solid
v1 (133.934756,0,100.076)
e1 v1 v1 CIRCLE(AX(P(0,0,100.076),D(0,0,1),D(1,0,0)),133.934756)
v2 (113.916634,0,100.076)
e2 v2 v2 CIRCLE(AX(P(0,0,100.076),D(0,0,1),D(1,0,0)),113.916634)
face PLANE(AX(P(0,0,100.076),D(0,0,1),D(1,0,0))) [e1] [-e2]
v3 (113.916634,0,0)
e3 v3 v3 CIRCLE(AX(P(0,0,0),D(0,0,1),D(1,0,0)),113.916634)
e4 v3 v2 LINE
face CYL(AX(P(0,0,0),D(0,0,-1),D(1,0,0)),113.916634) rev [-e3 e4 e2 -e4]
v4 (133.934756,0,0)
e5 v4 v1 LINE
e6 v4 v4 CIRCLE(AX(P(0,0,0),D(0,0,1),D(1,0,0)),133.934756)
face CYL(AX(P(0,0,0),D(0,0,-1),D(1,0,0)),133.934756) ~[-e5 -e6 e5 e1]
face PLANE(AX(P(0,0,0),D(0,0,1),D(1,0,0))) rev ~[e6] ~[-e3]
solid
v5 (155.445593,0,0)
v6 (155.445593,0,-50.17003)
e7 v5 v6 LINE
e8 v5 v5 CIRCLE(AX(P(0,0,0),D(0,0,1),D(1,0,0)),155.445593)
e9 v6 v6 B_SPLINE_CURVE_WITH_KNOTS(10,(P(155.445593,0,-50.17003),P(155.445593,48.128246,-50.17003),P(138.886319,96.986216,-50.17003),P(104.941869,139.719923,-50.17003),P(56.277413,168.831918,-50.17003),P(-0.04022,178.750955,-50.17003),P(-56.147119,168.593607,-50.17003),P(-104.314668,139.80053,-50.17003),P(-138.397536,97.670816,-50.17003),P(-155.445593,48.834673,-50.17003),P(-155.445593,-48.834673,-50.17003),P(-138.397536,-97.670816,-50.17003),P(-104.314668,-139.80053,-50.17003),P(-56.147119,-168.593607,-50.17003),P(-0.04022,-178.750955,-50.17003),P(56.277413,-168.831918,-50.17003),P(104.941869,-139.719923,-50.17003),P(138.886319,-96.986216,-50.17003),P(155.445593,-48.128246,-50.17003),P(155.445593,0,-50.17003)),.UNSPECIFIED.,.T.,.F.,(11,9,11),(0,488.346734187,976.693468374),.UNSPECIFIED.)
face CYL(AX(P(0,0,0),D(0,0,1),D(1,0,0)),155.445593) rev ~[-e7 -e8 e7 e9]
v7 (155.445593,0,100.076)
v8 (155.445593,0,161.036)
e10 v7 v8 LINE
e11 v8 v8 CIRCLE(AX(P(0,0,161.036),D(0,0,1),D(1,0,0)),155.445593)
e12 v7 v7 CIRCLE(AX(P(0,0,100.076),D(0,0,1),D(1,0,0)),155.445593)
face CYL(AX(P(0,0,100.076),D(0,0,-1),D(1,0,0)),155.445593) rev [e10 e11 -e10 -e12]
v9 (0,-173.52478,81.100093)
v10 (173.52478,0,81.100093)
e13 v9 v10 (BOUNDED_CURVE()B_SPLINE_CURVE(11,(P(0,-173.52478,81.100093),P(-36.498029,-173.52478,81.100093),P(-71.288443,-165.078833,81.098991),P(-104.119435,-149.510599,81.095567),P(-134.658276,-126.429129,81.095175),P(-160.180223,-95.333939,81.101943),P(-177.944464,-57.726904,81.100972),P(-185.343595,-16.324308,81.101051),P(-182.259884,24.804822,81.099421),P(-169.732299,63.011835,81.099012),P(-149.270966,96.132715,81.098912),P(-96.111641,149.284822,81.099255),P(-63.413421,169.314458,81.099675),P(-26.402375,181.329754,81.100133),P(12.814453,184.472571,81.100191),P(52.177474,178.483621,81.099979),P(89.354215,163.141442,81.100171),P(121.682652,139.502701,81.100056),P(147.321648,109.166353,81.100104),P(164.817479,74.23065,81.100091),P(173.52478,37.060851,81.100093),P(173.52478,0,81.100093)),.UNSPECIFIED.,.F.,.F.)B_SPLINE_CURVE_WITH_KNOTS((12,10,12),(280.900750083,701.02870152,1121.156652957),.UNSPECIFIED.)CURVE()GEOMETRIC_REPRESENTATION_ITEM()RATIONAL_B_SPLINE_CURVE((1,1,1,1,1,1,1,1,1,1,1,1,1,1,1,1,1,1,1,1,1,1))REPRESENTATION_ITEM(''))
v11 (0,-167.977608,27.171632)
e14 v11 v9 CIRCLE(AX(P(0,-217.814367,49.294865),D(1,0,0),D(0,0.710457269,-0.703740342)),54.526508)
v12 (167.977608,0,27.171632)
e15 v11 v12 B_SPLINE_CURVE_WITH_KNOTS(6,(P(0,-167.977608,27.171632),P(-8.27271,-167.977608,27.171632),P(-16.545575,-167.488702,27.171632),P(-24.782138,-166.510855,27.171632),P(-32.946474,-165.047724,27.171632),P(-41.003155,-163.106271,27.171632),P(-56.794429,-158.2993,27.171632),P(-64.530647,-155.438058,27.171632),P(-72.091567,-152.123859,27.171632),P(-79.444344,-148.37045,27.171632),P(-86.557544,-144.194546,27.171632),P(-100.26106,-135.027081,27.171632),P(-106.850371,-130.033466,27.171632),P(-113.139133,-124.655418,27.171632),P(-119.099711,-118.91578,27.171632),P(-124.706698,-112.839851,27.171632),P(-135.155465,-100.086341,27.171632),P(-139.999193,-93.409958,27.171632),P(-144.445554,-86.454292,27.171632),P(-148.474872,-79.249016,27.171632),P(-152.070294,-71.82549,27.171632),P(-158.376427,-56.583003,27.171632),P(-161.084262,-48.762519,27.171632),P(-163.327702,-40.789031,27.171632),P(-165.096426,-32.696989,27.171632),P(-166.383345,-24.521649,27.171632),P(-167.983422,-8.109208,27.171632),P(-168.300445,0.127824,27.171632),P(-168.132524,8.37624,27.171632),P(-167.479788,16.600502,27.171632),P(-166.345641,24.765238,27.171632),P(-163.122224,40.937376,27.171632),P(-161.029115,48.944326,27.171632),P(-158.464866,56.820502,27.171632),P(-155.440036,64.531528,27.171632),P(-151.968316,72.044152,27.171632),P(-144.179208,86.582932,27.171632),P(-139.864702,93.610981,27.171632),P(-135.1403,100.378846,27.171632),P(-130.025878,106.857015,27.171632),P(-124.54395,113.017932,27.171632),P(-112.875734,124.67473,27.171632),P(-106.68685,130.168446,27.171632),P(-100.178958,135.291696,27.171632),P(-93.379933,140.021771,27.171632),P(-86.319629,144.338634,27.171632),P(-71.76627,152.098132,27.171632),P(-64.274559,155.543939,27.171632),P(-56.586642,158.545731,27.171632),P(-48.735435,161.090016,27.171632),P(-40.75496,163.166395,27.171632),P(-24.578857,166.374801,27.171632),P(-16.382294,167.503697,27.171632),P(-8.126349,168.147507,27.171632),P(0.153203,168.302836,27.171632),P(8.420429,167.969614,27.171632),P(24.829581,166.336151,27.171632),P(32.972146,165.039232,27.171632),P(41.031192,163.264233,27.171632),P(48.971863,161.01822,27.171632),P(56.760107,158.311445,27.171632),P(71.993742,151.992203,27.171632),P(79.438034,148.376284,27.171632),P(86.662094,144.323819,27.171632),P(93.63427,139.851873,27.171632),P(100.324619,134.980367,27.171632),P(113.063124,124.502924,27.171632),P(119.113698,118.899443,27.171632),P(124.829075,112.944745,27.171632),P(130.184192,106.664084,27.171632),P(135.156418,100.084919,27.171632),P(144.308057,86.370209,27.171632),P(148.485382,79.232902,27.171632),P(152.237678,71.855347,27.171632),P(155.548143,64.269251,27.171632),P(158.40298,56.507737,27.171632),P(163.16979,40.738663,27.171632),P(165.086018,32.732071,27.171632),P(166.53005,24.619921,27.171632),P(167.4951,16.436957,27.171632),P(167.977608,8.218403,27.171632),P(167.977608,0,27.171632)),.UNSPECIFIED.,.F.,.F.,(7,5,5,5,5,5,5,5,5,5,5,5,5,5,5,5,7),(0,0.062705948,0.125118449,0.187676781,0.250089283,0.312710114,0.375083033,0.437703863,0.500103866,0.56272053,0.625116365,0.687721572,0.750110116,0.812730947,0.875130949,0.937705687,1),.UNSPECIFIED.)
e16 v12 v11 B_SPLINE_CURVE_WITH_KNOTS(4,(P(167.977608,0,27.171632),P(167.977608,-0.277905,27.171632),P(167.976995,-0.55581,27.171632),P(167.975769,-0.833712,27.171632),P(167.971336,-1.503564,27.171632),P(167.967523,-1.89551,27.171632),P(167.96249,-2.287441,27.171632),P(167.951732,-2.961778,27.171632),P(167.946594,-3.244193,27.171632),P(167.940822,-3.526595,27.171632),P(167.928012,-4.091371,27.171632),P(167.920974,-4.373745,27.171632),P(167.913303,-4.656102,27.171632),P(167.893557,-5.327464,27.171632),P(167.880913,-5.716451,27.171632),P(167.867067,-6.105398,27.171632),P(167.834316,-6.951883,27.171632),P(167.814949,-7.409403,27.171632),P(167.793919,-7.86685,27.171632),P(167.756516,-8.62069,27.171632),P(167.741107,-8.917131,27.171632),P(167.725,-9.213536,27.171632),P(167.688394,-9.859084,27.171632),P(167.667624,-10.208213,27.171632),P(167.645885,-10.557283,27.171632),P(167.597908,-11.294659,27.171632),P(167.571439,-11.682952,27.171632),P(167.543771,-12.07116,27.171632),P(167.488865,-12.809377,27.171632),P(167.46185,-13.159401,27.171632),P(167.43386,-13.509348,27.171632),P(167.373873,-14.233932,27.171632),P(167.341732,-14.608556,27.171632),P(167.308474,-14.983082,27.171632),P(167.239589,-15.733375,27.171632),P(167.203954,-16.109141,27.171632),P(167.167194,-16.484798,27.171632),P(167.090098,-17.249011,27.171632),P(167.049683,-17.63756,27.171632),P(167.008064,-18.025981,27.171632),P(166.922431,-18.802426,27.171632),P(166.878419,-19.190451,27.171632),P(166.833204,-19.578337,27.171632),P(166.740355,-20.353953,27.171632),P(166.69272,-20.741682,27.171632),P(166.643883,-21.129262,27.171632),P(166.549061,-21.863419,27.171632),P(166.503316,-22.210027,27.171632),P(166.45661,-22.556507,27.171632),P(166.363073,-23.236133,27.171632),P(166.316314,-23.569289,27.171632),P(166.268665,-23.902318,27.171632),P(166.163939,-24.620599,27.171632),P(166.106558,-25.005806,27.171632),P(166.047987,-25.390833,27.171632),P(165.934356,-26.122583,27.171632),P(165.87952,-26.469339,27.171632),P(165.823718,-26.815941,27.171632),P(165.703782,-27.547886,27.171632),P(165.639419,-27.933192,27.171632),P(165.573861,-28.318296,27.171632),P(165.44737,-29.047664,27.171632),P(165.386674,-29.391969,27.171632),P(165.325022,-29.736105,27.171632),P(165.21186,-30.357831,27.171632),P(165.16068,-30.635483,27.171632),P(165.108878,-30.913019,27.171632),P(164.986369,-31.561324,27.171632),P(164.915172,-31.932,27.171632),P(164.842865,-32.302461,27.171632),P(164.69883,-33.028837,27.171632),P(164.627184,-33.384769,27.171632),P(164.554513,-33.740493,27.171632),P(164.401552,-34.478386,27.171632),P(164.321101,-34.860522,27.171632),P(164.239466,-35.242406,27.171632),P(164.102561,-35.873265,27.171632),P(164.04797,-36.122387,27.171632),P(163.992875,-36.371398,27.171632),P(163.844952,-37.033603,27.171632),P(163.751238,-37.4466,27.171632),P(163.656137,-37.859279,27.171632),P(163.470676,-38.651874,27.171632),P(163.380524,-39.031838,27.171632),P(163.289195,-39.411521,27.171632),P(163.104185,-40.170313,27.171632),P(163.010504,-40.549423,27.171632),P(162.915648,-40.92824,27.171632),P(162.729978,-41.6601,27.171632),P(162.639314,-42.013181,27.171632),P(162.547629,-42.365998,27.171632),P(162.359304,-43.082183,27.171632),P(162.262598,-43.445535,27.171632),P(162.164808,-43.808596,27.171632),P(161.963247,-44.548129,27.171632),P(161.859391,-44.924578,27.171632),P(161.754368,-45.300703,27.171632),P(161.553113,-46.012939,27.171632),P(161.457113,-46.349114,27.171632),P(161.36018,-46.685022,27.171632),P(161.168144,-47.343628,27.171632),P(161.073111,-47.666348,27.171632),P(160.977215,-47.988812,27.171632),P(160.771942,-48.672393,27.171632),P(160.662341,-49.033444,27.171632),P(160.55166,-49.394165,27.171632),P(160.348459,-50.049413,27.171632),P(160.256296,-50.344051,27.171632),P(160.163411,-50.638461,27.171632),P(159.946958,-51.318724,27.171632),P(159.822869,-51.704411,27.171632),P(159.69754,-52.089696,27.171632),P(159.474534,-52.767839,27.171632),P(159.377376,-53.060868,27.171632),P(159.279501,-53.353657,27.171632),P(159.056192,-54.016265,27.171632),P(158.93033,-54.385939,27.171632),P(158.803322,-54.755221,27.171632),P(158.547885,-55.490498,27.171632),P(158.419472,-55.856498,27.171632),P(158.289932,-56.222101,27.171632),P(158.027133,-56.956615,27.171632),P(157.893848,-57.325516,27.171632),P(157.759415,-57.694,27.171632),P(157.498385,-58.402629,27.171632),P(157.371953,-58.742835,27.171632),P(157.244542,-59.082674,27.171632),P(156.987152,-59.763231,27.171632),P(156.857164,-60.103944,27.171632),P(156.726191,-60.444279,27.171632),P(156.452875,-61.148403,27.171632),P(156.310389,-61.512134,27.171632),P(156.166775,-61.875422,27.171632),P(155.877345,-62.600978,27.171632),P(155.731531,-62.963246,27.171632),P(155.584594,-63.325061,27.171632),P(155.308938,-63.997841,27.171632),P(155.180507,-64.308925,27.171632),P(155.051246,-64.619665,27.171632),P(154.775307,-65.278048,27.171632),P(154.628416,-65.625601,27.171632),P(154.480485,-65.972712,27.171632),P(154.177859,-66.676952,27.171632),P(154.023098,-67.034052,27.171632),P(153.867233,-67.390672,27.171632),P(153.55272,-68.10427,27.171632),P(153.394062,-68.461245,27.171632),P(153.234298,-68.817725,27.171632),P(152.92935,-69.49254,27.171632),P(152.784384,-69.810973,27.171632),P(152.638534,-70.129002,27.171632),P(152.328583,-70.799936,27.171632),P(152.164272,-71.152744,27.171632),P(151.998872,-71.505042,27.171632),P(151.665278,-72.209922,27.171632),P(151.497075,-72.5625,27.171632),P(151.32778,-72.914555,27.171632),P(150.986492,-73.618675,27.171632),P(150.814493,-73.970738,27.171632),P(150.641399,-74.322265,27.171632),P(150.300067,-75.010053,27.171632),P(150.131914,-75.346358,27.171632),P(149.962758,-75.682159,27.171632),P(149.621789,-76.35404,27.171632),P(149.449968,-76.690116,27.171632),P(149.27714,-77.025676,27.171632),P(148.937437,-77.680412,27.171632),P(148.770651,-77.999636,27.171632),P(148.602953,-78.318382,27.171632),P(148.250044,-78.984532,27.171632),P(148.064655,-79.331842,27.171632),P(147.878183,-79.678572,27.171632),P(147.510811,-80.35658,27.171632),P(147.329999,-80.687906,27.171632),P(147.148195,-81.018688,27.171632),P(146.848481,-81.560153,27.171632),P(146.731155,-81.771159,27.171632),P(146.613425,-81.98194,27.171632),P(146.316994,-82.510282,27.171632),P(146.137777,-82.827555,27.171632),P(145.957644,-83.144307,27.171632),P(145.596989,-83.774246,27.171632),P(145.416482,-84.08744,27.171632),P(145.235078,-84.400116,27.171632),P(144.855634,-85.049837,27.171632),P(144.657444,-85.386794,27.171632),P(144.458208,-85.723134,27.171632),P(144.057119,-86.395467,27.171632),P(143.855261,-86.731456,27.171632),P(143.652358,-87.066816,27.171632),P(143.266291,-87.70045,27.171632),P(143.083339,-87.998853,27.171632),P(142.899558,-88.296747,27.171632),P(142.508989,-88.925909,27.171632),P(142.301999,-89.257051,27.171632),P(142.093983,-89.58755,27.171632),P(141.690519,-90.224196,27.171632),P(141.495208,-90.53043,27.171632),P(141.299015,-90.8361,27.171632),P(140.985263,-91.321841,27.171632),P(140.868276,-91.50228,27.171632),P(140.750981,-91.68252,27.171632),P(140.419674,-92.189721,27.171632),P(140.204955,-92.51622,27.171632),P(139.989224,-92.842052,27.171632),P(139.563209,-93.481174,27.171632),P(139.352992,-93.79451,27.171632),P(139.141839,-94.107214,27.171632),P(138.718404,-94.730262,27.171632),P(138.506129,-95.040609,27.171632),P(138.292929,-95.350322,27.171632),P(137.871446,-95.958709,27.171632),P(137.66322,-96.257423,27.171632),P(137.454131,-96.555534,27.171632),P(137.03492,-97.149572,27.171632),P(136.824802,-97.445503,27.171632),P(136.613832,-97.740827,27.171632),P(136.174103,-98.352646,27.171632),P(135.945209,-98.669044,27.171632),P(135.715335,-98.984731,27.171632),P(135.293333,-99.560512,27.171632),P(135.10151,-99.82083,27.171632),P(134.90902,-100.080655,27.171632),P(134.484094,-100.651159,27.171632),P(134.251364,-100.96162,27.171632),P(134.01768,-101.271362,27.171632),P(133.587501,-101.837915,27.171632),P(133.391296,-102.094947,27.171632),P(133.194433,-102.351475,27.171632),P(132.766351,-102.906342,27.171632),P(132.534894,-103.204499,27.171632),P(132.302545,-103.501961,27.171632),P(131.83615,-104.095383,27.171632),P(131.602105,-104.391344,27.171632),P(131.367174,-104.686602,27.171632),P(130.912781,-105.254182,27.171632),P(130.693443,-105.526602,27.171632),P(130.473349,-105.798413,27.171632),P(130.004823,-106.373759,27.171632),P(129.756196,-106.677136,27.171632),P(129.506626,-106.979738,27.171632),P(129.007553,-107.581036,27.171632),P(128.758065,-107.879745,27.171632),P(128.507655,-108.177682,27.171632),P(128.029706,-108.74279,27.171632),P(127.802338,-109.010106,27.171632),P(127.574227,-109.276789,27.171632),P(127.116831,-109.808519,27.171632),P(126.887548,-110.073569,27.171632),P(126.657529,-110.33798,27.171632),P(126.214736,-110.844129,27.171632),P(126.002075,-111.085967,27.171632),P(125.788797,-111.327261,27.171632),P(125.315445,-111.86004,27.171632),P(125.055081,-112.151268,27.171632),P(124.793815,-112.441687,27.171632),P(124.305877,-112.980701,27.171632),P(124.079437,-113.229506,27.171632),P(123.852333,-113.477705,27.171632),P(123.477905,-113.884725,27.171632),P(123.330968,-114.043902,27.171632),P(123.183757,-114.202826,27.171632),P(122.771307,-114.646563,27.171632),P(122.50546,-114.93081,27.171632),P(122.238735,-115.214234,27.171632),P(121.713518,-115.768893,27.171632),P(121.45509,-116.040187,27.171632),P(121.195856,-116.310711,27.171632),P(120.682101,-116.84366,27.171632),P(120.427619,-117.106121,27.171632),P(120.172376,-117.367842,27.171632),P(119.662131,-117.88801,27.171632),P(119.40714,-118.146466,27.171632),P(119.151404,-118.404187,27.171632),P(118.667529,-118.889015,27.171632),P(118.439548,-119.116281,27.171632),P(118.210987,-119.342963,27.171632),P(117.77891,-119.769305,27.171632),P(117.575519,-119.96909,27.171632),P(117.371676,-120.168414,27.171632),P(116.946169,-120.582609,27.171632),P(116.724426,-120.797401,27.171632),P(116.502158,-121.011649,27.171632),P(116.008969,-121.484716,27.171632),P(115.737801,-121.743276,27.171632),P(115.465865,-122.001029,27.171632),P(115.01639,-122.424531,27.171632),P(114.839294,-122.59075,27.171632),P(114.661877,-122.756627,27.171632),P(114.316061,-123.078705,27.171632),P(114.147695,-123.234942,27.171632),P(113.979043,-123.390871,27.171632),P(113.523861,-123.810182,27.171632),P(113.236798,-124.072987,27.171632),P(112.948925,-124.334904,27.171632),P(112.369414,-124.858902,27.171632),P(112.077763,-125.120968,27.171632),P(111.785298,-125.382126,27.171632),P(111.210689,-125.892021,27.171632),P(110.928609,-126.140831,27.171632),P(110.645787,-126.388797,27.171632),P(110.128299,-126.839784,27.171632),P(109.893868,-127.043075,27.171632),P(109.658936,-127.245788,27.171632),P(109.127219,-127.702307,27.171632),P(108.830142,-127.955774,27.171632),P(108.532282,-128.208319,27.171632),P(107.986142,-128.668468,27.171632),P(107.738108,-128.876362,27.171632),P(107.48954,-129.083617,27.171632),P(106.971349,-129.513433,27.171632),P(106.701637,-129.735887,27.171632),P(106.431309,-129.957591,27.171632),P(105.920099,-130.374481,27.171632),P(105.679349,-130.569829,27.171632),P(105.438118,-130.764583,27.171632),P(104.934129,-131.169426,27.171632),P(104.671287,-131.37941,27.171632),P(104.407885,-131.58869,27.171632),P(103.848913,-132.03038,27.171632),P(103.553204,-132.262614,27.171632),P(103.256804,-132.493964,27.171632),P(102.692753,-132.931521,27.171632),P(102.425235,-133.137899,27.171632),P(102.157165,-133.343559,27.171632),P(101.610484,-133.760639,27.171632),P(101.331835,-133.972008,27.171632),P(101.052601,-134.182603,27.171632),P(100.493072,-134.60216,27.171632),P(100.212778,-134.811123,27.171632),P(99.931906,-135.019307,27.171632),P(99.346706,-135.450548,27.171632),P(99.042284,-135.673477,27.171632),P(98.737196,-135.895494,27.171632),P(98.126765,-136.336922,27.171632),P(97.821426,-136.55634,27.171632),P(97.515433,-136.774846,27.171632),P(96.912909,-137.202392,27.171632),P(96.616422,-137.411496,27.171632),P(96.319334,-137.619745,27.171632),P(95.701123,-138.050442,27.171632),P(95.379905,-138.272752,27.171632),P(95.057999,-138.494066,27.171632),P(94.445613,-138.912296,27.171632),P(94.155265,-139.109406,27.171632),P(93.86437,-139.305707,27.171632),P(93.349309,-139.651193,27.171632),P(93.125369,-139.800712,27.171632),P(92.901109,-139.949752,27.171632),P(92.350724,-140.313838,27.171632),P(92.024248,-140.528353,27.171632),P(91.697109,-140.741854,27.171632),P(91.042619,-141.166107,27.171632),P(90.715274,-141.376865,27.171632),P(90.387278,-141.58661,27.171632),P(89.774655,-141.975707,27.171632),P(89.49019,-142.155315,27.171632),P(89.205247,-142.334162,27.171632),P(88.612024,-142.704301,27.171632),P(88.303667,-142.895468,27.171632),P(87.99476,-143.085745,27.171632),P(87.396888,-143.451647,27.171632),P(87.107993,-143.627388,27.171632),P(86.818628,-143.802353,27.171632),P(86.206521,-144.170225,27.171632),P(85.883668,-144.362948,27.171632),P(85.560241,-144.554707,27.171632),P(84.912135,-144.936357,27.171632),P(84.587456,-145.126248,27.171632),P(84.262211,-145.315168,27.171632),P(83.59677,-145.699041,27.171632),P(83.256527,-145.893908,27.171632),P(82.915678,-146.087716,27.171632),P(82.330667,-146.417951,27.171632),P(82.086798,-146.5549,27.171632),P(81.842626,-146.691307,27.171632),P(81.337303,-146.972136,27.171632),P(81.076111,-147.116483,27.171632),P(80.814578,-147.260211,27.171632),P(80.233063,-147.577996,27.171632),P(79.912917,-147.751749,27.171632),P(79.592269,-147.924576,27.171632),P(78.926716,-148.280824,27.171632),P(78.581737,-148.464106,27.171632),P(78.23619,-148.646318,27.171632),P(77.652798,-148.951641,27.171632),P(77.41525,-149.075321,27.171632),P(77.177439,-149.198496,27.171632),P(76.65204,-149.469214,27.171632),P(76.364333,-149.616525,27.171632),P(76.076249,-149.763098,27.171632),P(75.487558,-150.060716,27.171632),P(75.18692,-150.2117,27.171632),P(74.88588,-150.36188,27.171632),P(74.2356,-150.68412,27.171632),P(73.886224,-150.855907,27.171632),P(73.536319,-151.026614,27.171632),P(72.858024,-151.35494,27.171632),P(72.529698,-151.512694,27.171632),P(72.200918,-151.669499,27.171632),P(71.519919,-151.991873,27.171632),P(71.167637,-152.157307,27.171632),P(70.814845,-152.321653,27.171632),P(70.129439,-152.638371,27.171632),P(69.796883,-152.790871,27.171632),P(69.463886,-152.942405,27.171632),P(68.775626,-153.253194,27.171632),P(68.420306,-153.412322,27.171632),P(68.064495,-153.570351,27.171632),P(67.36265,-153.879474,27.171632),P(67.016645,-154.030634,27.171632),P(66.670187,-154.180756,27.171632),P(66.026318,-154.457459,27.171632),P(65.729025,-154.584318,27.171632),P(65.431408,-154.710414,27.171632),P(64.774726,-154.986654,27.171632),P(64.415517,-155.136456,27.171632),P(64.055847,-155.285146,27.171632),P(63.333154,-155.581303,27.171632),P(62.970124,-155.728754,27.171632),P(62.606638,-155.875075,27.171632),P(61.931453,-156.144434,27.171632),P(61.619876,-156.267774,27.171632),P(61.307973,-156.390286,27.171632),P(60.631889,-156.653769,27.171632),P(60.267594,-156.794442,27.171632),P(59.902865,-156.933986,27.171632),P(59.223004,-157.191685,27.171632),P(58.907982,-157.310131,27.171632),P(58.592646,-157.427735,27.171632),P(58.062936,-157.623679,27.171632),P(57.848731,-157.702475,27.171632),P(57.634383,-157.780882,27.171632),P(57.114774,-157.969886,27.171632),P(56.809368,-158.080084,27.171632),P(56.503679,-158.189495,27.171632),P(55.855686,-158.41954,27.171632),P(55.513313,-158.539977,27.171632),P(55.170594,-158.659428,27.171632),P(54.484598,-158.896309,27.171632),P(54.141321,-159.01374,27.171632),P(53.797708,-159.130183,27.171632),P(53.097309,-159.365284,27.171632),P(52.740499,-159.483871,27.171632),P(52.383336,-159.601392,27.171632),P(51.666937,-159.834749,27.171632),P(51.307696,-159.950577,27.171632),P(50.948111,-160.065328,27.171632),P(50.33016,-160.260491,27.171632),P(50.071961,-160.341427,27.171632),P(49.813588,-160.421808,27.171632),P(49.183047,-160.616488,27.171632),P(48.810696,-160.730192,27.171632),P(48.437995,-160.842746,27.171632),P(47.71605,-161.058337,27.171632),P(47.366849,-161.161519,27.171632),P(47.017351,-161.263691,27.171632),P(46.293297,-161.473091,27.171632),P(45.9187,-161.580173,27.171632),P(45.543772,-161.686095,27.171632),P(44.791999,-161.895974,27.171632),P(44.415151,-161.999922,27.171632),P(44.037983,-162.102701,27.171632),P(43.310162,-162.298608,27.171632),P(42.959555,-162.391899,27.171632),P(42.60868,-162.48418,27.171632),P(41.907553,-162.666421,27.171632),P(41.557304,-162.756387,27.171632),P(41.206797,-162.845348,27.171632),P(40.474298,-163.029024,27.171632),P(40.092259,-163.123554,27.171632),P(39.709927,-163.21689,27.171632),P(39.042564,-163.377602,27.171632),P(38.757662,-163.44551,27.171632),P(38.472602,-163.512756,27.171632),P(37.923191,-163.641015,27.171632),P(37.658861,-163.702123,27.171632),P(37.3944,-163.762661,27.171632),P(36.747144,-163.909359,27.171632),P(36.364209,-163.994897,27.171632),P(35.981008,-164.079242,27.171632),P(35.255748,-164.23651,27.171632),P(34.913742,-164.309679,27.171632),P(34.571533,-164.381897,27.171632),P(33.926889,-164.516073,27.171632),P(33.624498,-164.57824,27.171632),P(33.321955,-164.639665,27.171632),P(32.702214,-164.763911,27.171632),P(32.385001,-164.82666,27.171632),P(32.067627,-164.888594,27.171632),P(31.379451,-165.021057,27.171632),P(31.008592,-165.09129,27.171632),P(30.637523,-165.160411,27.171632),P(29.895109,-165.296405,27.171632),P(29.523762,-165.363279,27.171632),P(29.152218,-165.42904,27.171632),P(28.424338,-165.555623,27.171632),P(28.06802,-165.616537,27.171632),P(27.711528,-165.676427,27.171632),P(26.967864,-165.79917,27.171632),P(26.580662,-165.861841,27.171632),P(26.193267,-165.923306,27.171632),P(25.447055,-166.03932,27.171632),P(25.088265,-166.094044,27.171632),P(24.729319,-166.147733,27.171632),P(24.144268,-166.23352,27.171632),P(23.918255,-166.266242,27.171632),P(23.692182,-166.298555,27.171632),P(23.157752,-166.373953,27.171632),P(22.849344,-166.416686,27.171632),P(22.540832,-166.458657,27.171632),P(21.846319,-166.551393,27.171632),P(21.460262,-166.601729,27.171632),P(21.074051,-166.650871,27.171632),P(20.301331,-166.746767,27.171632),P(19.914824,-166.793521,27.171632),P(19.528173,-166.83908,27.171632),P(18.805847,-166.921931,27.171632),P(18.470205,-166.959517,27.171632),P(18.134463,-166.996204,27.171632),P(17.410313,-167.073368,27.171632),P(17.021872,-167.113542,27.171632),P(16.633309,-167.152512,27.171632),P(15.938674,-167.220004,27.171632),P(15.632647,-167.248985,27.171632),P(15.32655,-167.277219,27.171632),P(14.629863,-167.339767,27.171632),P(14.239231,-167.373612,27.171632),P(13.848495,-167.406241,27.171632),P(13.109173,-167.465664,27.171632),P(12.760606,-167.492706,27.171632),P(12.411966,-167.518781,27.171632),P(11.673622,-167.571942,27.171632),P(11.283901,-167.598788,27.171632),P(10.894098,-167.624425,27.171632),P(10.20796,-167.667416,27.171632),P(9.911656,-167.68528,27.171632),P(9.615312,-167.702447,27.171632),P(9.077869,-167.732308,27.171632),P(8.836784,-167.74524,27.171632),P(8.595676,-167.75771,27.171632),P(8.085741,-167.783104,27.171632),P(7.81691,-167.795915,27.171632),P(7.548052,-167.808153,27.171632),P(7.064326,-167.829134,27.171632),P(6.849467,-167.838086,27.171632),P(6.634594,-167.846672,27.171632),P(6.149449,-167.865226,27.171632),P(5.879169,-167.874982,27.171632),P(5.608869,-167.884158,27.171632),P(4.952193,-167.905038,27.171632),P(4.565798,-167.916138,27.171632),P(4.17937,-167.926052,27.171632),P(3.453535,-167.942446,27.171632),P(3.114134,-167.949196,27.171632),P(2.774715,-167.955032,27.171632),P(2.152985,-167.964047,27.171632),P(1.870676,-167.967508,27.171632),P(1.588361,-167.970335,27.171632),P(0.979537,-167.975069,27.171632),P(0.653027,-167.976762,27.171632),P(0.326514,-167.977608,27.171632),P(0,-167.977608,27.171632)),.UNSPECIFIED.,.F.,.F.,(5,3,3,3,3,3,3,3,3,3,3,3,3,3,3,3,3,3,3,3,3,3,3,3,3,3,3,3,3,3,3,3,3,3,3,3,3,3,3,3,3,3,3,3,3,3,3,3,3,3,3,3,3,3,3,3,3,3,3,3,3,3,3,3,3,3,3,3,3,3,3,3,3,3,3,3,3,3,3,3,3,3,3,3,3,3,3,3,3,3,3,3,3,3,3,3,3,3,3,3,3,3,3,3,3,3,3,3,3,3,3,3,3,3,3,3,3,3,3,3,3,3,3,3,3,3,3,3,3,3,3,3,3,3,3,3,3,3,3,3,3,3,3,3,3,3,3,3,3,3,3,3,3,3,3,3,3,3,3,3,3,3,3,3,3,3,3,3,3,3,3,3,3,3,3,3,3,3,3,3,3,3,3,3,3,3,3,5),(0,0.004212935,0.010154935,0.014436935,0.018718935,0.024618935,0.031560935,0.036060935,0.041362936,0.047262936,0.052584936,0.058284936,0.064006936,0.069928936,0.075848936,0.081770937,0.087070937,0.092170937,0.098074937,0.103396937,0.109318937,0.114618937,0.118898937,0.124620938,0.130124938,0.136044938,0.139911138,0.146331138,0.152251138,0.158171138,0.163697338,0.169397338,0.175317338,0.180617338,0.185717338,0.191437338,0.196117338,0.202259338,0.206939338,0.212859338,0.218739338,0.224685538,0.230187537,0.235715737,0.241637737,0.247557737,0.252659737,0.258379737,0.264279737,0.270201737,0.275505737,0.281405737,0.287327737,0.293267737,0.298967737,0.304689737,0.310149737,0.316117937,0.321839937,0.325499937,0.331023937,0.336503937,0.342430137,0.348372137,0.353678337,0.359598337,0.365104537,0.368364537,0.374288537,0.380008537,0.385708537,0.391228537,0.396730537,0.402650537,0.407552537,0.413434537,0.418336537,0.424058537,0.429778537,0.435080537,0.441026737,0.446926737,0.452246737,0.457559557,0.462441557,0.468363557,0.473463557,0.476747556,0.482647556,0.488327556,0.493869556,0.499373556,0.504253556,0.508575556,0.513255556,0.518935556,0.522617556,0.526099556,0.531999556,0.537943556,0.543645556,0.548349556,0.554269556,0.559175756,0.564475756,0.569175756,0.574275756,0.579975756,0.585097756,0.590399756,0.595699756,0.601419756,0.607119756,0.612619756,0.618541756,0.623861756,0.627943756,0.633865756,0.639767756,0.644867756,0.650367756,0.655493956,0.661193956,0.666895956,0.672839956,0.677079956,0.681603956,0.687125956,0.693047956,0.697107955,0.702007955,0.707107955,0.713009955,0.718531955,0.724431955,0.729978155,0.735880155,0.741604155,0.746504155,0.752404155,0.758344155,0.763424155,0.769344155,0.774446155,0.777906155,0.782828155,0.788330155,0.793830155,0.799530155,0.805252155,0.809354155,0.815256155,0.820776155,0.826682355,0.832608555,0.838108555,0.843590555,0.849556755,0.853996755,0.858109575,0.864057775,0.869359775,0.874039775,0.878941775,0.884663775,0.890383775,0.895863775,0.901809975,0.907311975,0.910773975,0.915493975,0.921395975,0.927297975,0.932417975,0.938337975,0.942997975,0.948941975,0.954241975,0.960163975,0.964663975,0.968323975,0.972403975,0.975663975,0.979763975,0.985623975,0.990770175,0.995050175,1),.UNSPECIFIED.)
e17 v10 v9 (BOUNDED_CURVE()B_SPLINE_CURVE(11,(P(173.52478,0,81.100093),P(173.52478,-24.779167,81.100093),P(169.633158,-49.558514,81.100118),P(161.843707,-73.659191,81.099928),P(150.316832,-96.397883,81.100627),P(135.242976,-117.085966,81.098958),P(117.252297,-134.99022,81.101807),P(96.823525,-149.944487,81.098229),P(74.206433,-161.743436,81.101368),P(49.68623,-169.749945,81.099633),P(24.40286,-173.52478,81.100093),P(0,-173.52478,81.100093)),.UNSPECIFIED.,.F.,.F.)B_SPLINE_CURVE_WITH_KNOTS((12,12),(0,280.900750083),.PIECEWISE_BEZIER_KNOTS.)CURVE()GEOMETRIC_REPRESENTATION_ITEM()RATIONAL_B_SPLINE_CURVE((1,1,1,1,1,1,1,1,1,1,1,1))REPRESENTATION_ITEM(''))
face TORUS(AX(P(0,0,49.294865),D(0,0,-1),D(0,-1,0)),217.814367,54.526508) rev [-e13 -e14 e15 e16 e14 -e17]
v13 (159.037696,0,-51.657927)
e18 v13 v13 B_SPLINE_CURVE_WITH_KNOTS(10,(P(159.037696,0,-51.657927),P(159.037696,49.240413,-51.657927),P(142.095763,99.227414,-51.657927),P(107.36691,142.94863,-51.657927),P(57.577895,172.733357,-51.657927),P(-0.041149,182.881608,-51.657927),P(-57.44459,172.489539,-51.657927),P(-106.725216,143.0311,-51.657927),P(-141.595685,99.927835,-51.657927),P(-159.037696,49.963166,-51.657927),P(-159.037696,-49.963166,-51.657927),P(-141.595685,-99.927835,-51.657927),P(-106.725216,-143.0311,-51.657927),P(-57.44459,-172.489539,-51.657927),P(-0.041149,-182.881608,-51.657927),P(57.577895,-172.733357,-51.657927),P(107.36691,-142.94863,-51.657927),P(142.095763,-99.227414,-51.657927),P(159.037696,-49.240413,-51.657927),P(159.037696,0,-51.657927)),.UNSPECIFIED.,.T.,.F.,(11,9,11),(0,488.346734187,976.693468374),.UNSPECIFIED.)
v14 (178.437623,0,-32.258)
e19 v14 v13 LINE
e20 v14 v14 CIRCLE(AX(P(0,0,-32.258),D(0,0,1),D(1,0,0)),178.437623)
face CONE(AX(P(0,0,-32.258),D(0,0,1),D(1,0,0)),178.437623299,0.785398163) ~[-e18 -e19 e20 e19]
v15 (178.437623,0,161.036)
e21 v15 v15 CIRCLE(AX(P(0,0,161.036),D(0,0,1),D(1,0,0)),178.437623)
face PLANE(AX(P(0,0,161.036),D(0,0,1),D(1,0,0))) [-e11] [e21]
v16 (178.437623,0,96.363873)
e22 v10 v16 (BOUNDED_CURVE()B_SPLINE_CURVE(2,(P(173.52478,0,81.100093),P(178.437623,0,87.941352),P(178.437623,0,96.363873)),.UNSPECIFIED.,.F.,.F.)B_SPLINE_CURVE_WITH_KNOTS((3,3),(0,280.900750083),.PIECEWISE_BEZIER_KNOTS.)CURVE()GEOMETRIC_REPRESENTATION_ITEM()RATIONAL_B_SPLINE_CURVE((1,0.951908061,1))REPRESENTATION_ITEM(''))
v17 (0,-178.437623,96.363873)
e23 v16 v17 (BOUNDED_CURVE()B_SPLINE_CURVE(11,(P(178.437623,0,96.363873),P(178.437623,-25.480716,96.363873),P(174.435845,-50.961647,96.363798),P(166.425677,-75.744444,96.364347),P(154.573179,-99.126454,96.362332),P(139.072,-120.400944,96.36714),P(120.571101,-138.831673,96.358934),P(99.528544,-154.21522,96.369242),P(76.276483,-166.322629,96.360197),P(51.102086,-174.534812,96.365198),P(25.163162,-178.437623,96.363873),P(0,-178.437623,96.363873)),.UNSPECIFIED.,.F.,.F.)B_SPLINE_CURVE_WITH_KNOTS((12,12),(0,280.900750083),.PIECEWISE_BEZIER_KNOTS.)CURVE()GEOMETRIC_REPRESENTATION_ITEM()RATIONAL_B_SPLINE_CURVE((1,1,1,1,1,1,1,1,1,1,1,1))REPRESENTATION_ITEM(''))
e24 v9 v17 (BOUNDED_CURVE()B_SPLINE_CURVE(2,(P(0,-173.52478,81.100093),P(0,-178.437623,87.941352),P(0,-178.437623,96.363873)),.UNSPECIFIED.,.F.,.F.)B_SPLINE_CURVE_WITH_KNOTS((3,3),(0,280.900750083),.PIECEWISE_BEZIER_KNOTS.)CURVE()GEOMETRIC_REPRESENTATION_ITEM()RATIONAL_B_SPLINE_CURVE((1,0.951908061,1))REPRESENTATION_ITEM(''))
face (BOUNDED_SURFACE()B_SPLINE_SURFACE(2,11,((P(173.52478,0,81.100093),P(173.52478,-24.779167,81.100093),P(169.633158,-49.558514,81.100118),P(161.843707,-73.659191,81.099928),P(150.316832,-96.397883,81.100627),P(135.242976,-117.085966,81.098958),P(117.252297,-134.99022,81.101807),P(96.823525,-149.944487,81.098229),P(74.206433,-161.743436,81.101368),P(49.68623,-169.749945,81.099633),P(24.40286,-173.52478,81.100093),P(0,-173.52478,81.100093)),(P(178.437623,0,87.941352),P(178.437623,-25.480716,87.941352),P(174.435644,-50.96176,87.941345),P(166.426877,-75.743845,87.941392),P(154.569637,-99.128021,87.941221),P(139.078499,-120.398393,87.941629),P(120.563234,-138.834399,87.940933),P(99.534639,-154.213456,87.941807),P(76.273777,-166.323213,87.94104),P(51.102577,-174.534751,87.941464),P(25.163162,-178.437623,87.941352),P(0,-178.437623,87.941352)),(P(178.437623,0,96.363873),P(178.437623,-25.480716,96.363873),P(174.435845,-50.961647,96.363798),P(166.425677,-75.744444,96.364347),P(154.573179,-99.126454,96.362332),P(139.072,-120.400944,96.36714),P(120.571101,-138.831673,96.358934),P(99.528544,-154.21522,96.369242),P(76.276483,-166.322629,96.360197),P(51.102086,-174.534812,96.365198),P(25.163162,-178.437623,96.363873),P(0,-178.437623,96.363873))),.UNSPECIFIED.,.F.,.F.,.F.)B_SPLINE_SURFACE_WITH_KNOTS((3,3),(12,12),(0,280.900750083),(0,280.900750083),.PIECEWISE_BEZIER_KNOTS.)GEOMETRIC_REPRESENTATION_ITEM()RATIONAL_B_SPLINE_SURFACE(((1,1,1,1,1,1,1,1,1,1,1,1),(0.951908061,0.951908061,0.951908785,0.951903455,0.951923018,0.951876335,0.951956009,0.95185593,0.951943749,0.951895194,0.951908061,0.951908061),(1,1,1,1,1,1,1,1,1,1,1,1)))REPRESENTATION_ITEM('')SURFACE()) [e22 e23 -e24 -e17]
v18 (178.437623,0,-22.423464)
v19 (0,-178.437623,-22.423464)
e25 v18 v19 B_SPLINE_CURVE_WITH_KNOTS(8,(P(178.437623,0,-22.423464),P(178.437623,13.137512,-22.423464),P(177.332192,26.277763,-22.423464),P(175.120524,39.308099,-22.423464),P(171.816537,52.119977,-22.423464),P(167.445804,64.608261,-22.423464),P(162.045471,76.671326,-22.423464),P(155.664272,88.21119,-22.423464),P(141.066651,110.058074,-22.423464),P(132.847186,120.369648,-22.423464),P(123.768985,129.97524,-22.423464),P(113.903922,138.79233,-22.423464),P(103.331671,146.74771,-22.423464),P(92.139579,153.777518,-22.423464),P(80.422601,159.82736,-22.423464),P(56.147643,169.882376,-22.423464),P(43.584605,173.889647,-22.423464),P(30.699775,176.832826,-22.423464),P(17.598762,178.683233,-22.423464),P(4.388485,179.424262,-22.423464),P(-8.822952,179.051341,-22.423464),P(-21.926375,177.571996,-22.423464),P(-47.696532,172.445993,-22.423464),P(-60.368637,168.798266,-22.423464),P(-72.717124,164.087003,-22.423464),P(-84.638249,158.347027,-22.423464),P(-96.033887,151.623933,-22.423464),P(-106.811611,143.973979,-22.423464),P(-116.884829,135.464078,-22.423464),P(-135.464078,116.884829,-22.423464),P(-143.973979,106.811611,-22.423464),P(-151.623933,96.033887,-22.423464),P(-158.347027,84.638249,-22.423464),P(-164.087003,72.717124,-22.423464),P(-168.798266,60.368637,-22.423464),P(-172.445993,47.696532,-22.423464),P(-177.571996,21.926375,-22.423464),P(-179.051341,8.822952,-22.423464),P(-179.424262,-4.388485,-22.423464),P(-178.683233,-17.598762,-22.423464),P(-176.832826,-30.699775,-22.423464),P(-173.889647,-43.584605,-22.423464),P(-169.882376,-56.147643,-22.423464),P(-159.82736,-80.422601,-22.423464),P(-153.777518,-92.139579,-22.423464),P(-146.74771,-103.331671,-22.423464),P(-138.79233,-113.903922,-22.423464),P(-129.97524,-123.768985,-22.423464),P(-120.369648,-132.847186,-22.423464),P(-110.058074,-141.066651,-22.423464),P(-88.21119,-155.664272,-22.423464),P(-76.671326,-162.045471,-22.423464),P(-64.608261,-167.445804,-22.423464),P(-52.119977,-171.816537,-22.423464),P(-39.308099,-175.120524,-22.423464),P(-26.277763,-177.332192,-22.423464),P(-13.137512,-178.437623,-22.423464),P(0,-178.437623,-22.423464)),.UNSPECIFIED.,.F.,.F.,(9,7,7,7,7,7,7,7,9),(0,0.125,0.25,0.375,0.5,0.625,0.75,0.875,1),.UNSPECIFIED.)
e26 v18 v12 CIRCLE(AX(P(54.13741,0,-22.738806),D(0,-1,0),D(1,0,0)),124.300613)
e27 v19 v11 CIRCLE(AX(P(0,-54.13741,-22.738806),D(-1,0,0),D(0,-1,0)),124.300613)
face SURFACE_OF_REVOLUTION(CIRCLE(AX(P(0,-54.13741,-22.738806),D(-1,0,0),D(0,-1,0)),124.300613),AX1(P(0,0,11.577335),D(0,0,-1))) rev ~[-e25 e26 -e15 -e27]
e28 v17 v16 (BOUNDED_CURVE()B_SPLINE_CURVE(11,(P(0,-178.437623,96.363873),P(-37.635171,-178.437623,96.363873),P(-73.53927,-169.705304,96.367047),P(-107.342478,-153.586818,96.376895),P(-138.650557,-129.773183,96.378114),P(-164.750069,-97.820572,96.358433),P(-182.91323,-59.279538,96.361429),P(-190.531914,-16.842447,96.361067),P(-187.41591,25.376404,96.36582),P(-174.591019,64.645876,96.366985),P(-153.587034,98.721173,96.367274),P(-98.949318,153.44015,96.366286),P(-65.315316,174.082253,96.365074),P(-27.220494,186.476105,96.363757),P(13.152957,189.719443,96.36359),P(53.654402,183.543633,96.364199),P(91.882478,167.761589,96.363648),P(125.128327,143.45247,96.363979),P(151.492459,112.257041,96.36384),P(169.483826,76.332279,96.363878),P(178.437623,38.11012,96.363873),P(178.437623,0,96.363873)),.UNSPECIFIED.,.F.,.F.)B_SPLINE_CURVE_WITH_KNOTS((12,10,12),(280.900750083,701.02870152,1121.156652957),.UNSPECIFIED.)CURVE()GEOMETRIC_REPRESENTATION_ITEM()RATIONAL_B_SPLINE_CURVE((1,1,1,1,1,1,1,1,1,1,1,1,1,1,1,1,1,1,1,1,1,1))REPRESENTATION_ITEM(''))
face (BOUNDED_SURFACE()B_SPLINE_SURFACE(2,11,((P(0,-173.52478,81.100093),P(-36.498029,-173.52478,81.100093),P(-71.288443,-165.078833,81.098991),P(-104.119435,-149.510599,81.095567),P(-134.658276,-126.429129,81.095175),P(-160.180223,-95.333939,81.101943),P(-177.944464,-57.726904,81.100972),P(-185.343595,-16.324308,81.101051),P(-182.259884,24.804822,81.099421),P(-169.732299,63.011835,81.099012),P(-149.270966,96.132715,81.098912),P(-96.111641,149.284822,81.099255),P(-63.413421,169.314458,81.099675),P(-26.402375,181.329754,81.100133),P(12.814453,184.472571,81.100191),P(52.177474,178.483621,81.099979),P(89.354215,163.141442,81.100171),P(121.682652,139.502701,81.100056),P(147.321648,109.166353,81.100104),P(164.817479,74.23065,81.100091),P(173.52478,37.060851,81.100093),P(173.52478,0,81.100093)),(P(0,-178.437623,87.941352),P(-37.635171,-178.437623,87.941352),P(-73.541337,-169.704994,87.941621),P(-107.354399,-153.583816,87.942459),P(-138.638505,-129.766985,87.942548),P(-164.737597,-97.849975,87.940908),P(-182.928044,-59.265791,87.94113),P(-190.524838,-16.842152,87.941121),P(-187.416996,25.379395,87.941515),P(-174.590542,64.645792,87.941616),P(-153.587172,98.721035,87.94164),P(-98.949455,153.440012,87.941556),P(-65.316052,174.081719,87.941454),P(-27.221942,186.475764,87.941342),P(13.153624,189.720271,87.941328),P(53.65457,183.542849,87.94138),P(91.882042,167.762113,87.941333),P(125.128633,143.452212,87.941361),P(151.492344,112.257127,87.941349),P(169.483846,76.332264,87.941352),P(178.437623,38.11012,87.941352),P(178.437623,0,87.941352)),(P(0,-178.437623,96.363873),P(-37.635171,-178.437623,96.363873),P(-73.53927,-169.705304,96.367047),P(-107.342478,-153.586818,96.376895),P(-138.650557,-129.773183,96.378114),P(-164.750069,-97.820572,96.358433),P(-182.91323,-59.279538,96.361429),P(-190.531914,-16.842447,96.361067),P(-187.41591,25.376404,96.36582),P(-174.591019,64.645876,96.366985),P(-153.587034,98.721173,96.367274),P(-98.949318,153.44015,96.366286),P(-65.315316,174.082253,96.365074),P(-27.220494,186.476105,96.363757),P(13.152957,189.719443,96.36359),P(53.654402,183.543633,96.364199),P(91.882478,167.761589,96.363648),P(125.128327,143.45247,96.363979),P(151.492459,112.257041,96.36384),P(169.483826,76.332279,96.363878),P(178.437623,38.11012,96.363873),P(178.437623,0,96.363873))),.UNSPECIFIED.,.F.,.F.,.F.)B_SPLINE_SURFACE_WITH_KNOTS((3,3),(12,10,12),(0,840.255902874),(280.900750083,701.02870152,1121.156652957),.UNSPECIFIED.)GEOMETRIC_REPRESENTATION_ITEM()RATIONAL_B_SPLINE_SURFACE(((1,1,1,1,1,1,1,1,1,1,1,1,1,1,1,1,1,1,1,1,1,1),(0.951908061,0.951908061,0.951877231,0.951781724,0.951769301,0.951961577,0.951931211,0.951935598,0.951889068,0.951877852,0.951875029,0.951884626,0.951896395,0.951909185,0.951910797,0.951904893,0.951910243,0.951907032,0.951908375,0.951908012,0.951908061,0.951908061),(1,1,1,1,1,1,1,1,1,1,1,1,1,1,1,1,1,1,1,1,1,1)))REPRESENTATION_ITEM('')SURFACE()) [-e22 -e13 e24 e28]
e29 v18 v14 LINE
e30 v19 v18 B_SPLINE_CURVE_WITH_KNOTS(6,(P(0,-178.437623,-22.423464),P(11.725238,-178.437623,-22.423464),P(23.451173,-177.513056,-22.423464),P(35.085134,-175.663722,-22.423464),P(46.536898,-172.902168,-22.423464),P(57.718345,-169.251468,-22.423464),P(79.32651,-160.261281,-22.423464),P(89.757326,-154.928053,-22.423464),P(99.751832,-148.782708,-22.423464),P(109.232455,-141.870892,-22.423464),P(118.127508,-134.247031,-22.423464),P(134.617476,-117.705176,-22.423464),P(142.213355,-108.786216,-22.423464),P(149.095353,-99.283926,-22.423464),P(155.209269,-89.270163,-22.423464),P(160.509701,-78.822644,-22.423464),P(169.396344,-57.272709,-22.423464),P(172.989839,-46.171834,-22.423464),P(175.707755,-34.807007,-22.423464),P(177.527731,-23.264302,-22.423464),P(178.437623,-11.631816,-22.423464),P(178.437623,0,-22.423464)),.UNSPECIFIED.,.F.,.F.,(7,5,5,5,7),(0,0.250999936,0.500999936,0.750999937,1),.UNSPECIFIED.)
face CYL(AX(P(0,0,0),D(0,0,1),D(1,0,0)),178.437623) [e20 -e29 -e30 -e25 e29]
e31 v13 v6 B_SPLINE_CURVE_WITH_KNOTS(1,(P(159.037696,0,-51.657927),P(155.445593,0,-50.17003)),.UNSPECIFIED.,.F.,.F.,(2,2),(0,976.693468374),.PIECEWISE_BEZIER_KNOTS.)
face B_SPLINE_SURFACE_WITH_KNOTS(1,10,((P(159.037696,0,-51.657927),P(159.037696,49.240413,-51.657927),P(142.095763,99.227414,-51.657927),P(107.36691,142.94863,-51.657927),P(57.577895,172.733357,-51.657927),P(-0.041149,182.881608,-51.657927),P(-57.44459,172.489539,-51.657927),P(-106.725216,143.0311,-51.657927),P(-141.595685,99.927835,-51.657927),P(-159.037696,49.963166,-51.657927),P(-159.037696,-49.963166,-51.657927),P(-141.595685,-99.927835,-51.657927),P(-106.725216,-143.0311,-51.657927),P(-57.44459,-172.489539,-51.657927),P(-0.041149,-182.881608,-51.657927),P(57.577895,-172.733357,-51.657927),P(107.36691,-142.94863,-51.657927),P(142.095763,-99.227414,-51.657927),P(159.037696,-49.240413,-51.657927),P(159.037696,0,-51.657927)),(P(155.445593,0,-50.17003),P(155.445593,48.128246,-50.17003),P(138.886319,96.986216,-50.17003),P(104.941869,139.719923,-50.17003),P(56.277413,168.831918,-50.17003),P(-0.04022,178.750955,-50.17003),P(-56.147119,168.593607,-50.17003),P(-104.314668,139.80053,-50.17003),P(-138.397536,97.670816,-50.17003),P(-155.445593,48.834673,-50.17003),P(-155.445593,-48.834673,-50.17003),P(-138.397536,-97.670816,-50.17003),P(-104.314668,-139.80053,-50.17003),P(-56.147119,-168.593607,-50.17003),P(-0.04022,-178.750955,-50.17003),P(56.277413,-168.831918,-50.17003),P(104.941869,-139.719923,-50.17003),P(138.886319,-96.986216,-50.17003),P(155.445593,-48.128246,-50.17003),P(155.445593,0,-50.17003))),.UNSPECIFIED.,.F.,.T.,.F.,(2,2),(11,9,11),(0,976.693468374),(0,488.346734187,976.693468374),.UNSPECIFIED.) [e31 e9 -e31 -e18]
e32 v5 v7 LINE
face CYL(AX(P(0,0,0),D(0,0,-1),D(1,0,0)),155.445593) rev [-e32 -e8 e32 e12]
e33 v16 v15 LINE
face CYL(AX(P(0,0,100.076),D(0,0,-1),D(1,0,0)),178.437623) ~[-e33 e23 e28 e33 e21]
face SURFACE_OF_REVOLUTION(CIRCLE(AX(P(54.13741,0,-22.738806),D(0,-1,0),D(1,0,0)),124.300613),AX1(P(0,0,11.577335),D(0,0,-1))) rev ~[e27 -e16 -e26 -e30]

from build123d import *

# Parameters (mm, degrees)
F0_R        = 178.4376232985
F0_R_2      = 155.4455933773
F1_DEPTH    = 100.076
F0_R_3      = 133.9347560768
F0_R_4      = 113.9166344001
F4_DEPTH    = 57.658
F6_T2_ANGLE = 270
F6_T4_ANGLE = 90
F7_R        = 26.1680448885
F8_DEPTH    = 60.96
F9_SIZE     = 5.08


# Not quite as in the source:
# - a fillet or chamfer that OpenCascade refuses, or shapes differently, is made with other operations: its cross-section is extruded or revolved along the edge and cut away or added


with BuildPart() as f1:
    # F0 (on Top) → F1 (new body)
    with BuildSketch(Plane.XY):
        Circle(F0_R)
        Circle(F0_R_2, mode=Mode.SUBTRACT)
    extrude(amount=F1_DEPTH)

    # F2 (on Right) → F3 (revolve, cut)
    with BuildSketch(Plane.YZ):
        with BuildLine():
            Line((-211.7950618267, 10.4418387637), (-179.0756136179, 10.9223620966))
            ThreePointArc((-179.0756136179, 10.9223620966), (-163.2878596781, 49.2948652245), (-179.0756136179, 87.6673683524))
            Line((-179.0756136179, 87.6673683524), (-211.7950618267, 87.6673683524))
            Line((-211.7950618267, 87.6673683524), (-211.7950618267, 10.4418387637))
        make_face()
    revolve(axis=Axis((0, 0, 100.076), (0, 0, 1)), mode=Mode.SUBTRACT)

    # F4 (add): a face of the model
    f4_faces = [f1.faces().sort_by_distance(p)[0] for p in [
        (-173.3906451604, 0, 0),
    ]]
    extrude(f4_faces, amount=F4_DEPTH)

    # F5: chamfer of 25.4 on 1 edges, made by hand

    # F5_s1 → F5_t2 (revolve, cut)
    with BuildSketch(Plane.XZ):
        Polygon((178.4376232985, -32.258), (153.0376232985, -57.658), (178.4376232985, -57.658), align=None)
    revolve(axis=Axis((0, 0, -57.658), (0, 0, 1)), mode=Mode.SUBTRACT)

    # F6: fillet of radius 124.2982132205 on 5 edges, made by hand

    # F6_s1 → F6_t2 (revolve, cut)
    with BuildSketch(Plane.YZ):
        with BuildLine():
            ThreePointArc((-178.4380232985, -22.7388058016), (-175.7769269935, 2.8438127421), (-167.9075785228, 27.3310575799))
            Line((-167.9075785228, 27.3310575799), (-179.2845953673, 32.338043918))
            ThreePointArc((-179.2845953673, 32.338043918), (-182.8167956296, 25.9008324787), (-187.4140893132, 20.1755608169))
            Line((-187.4140893132, 20.1755608169), (-190.8676846206, 11.5773352816))
            ThreePointArc((-190.8676846206, 11.5773352816), (-190.8676846206, -5.58073526), (-190.8680846206, -22.7388058016))
            Line((-190.8680846206, -22.7388058016), (-178.4380232985, -22.7388058016))
        make_face()
    revolve(axis=Axis((0, 0, 11.5773352816), (0, 0, -1)), revolution_arc=F6_T2_ANGLE, mode=Mode.SUBTRACT)

    # F6_s3 → F6_t4 (revolve, cut)
    with BuildSketch(Plane.XZ):
        with BuildLine():
            ThreePointArc((178.4380232985, -22.7388058016), (175.7769269935, 2.8438127421), (167.9075785228, 27.3310575799))
            Line((167.9075785228, 27.3310575799), (179.2845953673, 32.338043918))
            ThreePointArc((179.2845953673, 32.338043918), (182.8167956296, 25.9008324787), (187.4140893132, 20.1755608169))
            Line((187.4140893132, 20.1755608169), (190.8676846206, 11.5773352816))
            ThreePointArc((190.8676846206, 11.5773352816), (190.8676846206, -5.58073526), (190.8680846206, -22.7388058016))
            Line((190.8680846206, -22.7388058016), (178.4380232985, -22.7388058016))
        make_face()
    revolve(axis=Axis((0, 0, 11.5773352816), (0, 0, -1)), revolution_arc=F6_T4_ANGLE, mode=Mode.SUBTRACT)

    # F7
    f7_edges = [f1.edges().sort_by_distance(p)[0] for p in [
        (-118.778106, 118.778106, 27.171632),
        (118.778106, -118.778106, 27.171632),
        (0, -164.10225, 58.683609),
        (126.174453, -126.174453, 87.012395),
        (-126.174453, 126.174453, 87.012395),
    ]]
    fillet(f7_edges, radius=F7_R)

    # F8 (add): a face of the model
    f8_faces = [f1.faces().sort_by_distance(p)[0] for p in [
        (-173.3906451604, 0, 100.076),
    ]]
    extrude(f8_faces, amount=F8_DEPTH)

    # F9
    f9_edges = [f1.edges().sort_by_distance(p)[0] for p in [
        (-155.445593, 0, -55.25003),
    ]]
    chamfer(f9_edges, length=F9_SIZE)


with BuildPart() as f1b:
    # F0 (on Top) → F1, piece 2 (new body)
    with BuildSketch(Plane.XY):
        Circle(F0_R_3)
        Circle(F0_R_4, mode=Mode.SUBTRACT)
    extrude(amount=F1_DEPTH)


solid = Compound([f1.part, f1b.part])
